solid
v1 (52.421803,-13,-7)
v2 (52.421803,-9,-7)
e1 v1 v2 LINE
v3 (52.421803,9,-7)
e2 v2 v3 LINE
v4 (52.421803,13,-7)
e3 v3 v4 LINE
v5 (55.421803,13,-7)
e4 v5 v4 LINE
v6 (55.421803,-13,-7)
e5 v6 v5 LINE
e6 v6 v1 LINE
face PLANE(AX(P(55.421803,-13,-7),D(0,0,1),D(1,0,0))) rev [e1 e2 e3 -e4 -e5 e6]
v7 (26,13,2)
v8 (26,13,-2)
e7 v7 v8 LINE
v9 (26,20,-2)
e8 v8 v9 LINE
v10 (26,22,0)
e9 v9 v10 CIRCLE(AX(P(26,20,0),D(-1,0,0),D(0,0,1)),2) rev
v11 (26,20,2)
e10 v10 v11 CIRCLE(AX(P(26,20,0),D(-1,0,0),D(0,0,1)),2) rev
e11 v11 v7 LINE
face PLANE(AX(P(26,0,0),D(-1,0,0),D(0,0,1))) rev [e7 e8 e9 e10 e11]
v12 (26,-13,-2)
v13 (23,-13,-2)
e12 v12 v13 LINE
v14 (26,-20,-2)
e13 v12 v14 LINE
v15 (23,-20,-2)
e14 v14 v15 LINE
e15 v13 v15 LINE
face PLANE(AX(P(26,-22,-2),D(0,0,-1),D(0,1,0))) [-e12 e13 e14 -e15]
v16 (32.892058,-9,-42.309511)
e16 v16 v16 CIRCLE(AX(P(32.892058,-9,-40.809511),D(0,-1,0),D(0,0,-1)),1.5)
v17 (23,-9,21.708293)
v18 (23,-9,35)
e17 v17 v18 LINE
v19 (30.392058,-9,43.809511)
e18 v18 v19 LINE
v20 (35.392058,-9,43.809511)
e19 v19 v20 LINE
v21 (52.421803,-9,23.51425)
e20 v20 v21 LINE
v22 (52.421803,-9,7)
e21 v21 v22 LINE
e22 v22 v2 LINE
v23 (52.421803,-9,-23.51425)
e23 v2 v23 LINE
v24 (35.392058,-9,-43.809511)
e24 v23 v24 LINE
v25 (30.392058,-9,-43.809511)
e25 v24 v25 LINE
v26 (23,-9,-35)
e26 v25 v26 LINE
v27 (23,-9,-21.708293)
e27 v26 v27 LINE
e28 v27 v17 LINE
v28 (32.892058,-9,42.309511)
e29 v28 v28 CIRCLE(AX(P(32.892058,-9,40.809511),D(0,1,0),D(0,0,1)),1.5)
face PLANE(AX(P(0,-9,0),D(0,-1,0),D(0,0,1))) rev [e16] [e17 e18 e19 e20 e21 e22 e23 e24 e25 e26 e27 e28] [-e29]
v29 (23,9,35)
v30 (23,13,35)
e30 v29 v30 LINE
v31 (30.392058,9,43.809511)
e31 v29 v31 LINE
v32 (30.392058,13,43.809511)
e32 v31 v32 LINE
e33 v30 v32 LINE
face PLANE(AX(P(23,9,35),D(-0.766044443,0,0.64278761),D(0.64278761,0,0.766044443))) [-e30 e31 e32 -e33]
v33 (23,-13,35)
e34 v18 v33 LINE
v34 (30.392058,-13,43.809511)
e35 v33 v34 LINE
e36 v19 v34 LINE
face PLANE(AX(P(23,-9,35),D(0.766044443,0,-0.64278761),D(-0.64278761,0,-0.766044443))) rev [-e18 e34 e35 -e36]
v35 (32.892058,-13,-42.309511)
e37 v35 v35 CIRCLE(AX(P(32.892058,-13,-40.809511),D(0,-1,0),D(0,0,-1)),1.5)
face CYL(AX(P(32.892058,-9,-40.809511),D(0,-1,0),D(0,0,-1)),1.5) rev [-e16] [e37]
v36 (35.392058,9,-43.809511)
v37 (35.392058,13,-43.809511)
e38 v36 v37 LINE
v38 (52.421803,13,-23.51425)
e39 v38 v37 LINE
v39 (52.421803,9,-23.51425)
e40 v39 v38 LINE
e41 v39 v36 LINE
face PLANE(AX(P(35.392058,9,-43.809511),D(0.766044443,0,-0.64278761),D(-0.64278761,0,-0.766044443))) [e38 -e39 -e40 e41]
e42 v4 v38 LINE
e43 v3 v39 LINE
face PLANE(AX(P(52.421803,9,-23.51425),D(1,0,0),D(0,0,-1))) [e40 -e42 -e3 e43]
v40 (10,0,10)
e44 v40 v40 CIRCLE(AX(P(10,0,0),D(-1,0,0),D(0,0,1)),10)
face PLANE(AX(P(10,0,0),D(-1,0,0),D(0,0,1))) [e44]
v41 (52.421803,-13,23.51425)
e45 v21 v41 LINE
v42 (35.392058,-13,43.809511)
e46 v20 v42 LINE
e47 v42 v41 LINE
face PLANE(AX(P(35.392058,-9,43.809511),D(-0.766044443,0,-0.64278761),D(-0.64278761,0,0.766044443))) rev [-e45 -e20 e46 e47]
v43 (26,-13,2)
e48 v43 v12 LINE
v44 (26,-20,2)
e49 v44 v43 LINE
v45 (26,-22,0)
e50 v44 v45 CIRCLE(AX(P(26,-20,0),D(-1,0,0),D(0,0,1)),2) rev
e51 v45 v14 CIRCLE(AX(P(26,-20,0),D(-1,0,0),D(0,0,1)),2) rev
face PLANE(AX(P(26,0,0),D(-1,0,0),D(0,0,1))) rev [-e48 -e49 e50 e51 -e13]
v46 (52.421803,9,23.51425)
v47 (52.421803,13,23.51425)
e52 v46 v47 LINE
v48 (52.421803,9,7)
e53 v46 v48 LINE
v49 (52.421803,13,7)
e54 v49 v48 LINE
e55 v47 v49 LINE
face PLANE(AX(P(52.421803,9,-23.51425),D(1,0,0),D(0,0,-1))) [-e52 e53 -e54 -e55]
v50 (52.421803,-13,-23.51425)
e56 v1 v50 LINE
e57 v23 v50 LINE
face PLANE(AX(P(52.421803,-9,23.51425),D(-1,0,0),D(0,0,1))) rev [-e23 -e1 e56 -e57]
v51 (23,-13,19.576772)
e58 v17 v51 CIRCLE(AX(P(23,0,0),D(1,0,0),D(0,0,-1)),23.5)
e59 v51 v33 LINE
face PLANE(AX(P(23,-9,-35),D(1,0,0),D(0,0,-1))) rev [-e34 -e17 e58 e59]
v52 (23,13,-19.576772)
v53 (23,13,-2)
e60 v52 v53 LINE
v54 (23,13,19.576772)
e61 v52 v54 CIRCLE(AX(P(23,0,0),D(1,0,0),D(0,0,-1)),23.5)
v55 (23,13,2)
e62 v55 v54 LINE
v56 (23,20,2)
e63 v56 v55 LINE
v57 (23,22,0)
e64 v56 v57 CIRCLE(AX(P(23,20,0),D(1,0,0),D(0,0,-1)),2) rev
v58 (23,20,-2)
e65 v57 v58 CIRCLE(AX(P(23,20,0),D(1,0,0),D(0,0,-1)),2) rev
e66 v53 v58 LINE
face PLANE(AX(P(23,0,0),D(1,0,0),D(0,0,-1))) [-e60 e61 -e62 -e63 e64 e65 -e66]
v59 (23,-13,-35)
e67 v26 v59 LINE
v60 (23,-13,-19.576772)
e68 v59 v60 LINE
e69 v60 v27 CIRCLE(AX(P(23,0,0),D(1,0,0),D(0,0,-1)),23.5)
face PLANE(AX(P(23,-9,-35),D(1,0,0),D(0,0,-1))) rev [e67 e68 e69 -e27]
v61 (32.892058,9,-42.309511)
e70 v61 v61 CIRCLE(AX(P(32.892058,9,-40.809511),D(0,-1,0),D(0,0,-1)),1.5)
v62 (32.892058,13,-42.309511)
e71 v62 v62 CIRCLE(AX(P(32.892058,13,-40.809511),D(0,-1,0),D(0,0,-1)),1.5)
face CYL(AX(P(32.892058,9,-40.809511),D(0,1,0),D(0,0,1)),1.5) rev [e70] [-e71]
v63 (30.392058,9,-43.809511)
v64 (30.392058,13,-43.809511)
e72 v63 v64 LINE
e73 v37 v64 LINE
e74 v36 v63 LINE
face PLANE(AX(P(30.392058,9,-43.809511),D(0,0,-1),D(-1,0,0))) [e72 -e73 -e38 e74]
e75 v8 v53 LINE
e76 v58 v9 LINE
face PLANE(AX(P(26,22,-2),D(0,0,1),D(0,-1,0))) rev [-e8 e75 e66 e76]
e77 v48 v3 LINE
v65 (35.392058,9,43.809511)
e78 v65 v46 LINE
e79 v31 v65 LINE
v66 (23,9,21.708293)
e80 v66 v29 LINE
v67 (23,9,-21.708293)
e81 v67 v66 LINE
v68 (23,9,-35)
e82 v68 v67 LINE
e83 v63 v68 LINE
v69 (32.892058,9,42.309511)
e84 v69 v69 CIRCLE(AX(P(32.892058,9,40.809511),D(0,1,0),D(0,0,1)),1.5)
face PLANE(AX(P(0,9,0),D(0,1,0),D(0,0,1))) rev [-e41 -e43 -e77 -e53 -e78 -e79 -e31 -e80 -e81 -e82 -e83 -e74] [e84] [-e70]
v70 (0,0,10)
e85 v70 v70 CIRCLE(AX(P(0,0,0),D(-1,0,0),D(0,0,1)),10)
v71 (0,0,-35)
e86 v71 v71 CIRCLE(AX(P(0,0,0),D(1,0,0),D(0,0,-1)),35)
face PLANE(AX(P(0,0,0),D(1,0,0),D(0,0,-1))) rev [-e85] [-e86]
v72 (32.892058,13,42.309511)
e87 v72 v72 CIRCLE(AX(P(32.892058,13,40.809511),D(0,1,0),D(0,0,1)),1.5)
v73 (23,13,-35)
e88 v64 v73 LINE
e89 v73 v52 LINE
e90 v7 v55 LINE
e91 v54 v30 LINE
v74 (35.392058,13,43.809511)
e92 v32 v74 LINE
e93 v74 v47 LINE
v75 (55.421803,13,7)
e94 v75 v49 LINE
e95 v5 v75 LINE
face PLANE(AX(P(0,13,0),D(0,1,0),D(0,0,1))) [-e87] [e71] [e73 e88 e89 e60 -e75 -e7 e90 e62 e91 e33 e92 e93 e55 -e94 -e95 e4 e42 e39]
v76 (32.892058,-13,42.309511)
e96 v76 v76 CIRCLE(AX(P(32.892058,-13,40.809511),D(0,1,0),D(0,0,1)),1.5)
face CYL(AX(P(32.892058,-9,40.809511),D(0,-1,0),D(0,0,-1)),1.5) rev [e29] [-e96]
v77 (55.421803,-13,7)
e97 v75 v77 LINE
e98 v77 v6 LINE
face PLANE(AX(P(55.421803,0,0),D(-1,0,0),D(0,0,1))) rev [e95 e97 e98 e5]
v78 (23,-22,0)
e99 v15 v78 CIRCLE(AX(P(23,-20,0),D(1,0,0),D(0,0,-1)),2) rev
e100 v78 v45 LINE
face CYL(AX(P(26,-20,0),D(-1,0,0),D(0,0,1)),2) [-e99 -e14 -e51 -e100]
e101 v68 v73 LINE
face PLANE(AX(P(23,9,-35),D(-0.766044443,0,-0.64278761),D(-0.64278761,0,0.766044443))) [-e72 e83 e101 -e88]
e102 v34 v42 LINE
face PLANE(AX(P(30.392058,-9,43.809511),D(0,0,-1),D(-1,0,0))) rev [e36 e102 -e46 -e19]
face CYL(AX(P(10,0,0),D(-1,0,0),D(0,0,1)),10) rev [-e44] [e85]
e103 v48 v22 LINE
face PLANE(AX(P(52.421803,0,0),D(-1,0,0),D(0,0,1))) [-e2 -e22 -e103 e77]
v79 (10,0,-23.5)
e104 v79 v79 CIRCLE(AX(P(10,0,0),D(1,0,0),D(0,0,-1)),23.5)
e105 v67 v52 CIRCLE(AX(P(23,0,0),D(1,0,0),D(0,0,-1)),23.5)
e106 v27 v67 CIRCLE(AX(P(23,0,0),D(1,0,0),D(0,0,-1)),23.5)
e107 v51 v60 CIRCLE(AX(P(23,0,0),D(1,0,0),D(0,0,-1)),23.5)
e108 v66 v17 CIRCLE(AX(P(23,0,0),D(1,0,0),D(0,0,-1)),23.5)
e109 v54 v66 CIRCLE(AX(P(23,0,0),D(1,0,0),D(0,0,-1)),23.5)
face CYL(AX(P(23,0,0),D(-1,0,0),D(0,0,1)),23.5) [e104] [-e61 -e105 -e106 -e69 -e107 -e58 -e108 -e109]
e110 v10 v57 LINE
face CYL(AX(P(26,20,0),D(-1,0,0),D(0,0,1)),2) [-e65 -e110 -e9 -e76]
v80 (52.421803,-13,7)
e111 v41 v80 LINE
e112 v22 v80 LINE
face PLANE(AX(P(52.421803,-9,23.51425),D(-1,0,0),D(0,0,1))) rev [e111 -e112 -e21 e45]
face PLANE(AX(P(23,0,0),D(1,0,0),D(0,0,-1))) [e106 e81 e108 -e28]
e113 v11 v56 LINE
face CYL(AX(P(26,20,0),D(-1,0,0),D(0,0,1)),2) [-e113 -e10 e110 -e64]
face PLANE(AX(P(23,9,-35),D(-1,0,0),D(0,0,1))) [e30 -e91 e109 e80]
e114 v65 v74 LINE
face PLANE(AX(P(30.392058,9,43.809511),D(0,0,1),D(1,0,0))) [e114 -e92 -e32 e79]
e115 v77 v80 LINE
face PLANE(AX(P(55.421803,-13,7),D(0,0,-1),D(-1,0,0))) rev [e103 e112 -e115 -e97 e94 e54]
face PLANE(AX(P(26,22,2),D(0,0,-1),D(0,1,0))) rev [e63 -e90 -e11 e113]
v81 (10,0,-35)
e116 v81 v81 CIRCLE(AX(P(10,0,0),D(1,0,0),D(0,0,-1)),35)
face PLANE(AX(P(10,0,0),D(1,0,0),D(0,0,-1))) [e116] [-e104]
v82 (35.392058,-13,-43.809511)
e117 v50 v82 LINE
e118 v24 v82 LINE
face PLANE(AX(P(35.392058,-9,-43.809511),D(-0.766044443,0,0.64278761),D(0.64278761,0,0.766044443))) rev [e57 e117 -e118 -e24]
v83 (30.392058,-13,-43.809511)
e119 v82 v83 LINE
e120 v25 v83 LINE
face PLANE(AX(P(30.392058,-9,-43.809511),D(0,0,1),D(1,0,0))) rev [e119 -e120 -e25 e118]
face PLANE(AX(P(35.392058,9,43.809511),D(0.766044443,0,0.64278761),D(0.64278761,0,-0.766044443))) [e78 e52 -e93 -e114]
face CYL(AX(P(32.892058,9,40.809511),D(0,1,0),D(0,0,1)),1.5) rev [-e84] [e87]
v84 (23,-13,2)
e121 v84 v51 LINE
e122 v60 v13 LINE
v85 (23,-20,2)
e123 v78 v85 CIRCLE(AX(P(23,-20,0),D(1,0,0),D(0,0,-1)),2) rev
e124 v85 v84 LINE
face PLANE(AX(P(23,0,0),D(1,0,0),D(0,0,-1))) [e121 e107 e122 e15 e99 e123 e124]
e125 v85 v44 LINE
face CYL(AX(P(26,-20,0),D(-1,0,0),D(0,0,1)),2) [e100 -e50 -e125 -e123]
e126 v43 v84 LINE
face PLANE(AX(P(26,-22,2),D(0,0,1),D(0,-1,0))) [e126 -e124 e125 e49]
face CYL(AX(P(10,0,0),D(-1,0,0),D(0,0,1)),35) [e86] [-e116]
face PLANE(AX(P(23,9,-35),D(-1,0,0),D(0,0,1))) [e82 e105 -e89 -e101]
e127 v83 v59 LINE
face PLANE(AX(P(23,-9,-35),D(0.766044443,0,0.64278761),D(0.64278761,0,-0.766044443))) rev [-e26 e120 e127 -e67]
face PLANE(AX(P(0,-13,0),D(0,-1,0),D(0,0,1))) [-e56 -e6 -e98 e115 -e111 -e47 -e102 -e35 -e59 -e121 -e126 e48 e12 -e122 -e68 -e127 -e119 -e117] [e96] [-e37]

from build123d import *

# Parameters (mm, degrees)
SKETCH1_R               = 35
BOSS_EXTRUDE1_DEPTH     = 10
SKETCH2_R               = 23.5
BOSS_EXTRUDE2_DEPTH     = 13
BOSS_EXTRUDE3_DEPTH     = 4
SKETCH5_R               = 1.5
CUT_EXTRUDE1_DEPTH      = 4
MIRROR3_COPY_1_SKETCH_R = 1.5
MIRROR3_COPY_1_DEPTH    = 4
BOSS_EXTRUDE4_DEPTH     = 3
FILLET1_R               = 2
FILLET1_OF_MIRROR5_R    = 2
SKETCH8_W               = 14
SKETCH8_H               = 26
BOSS_EXTRUDE5_DEPTH     = 3
SKETCH9_R               = 10
CUT_EXTRUDE2_DEPTH      = 10


with BuildPart() as part:
    # Sketch1 → Boss-Extrude1 (new body)
    with BuildSketch(Plane(origin=(0, 0, 0), x_dir=(0, 0, -1), z_dir=(1, 0, 0))):
        Circle(SKETCH1_R)
    extrude(amount=BOSS_EXTRUDE1_DEPTH)

    # Sketch2 → Boss-Extrude2 (add)
    with BuildSketch(Plane(origin=(10, 0, 0), x_dir=(0, 0, -1), z_dir=(1, 0, 0))):
        with Locations(Location((0, 0, 0), (0, 0, 180))):
            Circle(SKETCH2_R)
    extrude(amount=BOSS_EXTRUDE2_DEPTH)

    # Sketch3 → Boss-Extrude3 (add)
    with BuildSketch(Plane(origin=(0, 13, 0), x_dir=(1, 0, 0), z_dir=(0, 1, 0))):
        Polygon((23, 35), (23, -35), (30.392057511, -43.809511096), (35.392057511, -43.809511096), (52.421803319, -23.514250349), (52.421803319, 0), (52.421803319, 23.514250349), (35.392057511, 43.809511096), (30.392057511, 43.809511096), align=None)
    boss_extrude3 = extrude(amount=-BOSS_EXTRUDE3_DEPTH)

    # Sketch5 → Cut-Extrude1 (cut)
    with BuildSketch(Plane(origin=(0, 13, 0), x_dir=(1, 0, 0), z_dir=(0, 1, 0))):
        with Locations(Location((32.892057511, -40.809511096, 0), (0, 0, 270))):
            Circle(SKETCH5_R)
    cut_extrude1 = extrude(amount=-CUT_EXTRUDE1_DEPTH, mode=Mode.SUBTRACT)

    # Mirror2: Cut-Extrude1 across plane
    add(cut_extrude1.mirror(Plane.XY), mode=Mode.SUBTRACT)

    # Mirror3: Boss-Extrude3, Cut-Extrude1 across plane
    add(boss_extrude3.mirror(Plane.ZX))
    add(cut_extrude1.mirror(Plane.ZX), mode=Mode.SUBTRACT)

    # Mirror3 copy 1 sketch → Mirror3 copy 1 (cut)
    with BuildSketch(Plane.XZ.offset(13)):
        with Locations(Location((32.892057511, -40.809511096, 0), (0, 0, 270))):
            Circle(MIRROR3_COPY_1_SKETCH_R)
    extrude(amount=-MIRROR3_COPY_1_DEPTH, mode=Mode.SUBTRACT)

    # Sketch7 → Boss-Extrude4 (add)
    with BuildSketch(Plane(origin=(23, 0, 0), x_dir=(0, 0, -1), z_dir=(1, 0, 0))):
        Polygon((0, 22), (-2, 22), (-2, 13), (2, 13), (2, 22), align=None)
    boss_extrude4 = extrude(amount=BOSS_EXTRUDE4_DEPTH)

    # Fillet1
    fillet1_edges = [part.edges().sort_by_distance(p)[0] for p in [
        (24.5, 22, 2),
        (24.5, 22, -2),
    ]]
    fillet(fillet1_edges, radius=FILLET1_R - 0.0001)  # a hair under: the kernel refuses the full size

    # Mirror5: Boss-Extrude4 across plane
    add(boss_extrude4.mirror(Plane.ZX))

    # Fillet1 of Mirror5
    fillet1_of_mirror5_edges = [part.edges().sort_by_distance(p)[0] for p in [
        (24.5, -22, 2),
        (24.5, -22, -2),
    ]]
    fillet(fillet1_of_mirror5_edges, radius=FILLET1_OF_MIRROR5_R - 0.0001)  # a hair under: the kernel refuses the full size

    # Sketch8 → Boss-Extrude5 (add)
    with BuildSketch(Plane(origin=(52.421803319, 0, 0), x_dir=(0, 0, -1), z_dir=(1, 0, 0))):
        Rectangle(SKETCH8_W, SKETCH8_H)
    extrude(amount=BOSS_EXTRUDE5_DEPTH)

    # Sketch9 → Cut-Extrude2 (cut)
    with BuildSketch(Plane.ZY):
        Circle(SKETCH9_R)
    extrude(amount=-CUT_EXTRUDE2_DEPTH, mode=Mode.SUBTRACT)


solid = part.part
